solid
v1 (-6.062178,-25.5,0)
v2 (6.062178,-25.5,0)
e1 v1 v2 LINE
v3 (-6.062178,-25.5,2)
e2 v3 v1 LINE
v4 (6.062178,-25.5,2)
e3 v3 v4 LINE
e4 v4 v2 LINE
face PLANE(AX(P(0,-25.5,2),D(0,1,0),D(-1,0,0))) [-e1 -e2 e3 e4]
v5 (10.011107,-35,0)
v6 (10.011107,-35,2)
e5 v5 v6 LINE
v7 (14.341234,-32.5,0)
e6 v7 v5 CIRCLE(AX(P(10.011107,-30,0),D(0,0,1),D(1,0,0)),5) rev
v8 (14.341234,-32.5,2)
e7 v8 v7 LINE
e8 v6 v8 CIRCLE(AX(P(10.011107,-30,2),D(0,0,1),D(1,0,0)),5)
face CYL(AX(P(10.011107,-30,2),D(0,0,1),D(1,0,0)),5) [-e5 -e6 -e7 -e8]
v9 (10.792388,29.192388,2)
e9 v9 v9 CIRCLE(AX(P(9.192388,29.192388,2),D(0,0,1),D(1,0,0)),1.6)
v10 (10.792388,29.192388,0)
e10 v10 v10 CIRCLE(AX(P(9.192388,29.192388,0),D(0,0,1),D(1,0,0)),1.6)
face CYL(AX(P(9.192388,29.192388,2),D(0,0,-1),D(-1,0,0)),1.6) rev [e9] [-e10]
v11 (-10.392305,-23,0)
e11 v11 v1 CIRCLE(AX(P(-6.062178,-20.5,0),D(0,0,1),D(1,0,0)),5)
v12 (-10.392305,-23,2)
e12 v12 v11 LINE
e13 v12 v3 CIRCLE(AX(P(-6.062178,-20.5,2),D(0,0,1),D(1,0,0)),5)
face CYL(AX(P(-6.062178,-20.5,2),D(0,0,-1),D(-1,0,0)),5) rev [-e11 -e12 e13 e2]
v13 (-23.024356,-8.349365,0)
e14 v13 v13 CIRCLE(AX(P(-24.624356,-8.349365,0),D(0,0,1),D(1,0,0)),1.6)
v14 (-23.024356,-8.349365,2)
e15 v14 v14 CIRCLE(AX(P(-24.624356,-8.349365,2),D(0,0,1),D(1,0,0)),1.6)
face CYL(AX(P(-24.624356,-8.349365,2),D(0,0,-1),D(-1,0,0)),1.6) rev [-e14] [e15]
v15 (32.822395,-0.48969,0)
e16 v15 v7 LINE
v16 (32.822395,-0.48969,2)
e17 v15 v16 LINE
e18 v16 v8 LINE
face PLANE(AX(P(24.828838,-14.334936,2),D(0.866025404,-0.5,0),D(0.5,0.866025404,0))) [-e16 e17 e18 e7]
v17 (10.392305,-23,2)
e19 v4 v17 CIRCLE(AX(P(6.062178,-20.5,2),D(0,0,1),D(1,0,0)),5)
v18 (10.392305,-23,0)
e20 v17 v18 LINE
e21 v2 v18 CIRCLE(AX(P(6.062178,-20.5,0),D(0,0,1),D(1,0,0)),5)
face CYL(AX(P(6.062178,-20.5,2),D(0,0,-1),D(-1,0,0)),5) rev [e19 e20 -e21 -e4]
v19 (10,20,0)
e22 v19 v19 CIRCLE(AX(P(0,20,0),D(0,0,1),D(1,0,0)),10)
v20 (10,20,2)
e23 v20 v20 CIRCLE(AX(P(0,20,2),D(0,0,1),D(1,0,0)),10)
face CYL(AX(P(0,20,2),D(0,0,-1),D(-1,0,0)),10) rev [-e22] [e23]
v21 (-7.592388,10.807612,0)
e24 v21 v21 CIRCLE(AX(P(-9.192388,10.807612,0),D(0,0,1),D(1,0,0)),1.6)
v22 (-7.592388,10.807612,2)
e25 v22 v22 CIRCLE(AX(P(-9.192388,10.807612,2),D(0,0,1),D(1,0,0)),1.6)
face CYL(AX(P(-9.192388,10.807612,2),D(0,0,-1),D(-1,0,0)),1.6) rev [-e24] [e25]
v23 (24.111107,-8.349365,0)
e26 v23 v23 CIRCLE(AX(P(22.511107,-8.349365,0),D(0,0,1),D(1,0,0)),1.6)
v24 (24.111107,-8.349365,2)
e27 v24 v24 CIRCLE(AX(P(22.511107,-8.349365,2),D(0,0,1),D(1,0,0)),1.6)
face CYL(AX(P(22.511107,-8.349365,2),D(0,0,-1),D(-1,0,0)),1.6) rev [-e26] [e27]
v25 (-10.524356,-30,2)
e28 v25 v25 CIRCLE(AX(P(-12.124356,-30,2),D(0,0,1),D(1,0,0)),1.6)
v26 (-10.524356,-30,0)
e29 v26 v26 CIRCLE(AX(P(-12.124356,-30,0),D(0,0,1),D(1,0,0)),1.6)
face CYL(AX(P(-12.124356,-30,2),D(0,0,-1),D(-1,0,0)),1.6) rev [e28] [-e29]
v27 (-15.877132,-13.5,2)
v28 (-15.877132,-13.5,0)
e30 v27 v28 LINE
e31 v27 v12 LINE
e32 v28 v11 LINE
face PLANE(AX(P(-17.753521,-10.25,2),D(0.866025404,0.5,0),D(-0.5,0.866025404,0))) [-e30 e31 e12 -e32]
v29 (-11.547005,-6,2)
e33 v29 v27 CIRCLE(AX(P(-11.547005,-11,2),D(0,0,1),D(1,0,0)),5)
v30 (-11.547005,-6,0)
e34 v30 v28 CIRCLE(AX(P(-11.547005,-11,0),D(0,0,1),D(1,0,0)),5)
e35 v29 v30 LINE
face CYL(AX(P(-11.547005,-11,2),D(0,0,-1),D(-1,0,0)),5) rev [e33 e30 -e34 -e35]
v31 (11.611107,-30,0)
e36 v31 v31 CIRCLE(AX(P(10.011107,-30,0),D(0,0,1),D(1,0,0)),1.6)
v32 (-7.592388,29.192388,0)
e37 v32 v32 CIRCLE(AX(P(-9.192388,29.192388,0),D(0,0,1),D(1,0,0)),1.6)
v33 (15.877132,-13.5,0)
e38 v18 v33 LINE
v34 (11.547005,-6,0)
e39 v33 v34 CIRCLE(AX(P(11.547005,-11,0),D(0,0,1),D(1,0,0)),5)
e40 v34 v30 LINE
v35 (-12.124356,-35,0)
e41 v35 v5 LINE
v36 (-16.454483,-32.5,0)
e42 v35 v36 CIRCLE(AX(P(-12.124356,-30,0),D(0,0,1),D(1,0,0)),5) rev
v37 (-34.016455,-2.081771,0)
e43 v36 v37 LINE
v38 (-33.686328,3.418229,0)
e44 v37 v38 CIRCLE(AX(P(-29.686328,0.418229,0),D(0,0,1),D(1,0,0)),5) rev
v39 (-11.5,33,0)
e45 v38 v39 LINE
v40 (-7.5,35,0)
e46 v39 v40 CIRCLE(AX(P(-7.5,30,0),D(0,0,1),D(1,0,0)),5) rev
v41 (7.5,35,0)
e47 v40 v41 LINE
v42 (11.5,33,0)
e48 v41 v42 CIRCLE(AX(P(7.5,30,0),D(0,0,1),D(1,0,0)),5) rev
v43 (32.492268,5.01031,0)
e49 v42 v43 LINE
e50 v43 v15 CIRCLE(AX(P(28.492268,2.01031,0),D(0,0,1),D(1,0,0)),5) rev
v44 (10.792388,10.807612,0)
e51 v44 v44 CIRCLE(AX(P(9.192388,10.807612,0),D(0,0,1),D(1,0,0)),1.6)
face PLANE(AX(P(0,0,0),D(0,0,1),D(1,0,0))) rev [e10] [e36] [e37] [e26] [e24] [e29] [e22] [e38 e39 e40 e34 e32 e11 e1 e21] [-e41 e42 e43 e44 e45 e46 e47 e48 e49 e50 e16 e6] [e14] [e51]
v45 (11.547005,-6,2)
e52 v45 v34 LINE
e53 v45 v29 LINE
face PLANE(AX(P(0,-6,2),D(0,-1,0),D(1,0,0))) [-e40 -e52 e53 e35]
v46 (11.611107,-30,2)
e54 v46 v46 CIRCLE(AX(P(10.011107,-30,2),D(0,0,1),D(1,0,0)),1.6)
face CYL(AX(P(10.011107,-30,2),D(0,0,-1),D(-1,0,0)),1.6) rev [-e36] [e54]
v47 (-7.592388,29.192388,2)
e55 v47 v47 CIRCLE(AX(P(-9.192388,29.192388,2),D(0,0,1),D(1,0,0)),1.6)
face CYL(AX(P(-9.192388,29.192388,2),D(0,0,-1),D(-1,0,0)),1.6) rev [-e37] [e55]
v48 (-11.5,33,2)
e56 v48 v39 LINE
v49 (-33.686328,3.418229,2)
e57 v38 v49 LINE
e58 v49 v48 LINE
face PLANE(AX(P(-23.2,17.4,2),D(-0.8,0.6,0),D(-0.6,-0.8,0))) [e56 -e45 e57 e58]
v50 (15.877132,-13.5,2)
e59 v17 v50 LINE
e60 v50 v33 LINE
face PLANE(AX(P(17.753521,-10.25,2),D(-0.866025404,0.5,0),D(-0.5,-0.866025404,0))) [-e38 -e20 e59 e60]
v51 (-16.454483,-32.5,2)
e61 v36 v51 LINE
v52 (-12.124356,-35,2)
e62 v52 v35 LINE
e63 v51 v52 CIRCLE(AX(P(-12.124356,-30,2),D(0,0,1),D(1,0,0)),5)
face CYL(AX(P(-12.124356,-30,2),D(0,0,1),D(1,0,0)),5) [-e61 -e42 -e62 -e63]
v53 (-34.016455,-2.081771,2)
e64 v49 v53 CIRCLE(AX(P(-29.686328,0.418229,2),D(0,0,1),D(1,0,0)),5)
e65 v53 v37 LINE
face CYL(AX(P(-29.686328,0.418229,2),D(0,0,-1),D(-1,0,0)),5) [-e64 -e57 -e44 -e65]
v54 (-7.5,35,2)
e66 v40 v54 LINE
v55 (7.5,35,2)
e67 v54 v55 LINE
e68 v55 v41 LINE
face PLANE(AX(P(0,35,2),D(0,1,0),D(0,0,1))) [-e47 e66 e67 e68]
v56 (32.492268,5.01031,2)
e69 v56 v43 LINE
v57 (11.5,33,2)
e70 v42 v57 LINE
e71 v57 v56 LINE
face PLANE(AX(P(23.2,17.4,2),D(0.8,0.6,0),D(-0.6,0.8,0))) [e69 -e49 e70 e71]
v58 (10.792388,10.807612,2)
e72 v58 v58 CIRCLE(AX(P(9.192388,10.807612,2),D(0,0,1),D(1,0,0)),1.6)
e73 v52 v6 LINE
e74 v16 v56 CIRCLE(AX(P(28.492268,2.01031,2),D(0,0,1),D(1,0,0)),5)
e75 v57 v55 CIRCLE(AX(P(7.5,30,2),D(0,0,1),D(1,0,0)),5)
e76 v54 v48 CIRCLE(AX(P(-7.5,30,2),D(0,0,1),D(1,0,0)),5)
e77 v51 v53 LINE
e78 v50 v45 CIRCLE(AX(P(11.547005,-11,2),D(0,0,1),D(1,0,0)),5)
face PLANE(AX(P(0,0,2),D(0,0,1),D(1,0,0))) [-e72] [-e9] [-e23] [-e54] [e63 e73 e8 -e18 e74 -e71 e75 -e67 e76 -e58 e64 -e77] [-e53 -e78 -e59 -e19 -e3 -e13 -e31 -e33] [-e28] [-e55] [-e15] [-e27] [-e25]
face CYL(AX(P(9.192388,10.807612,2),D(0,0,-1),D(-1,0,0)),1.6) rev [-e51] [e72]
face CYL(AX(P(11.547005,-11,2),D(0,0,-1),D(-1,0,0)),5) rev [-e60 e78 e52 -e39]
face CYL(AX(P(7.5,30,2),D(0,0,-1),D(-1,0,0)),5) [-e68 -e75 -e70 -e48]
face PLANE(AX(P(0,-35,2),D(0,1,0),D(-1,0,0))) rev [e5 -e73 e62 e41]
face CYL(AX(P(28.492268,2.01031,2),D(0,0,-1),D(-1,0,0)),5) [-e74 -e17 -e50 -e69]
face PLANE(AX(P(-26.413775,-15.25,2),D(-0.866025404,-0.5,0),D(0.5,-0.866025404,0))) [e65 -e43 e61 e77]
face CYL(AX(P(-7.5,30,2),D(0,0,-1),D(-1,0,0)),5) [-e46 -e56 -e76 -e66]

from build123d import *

# Parameters (mm, degrees)
EXTRUDE_1_OUTLINE_R   = 1.6
EXTRUDE_1_OUTLINE_R_2 = 10
EXTRUDE_1_DEPTH       = 2
FILLET_1_R            = 5


# Read off the part's stored shape, not the designer's step: ﾎﾞｽ - 押し出し1
with BuildPart() as part:
    # ﾎﾞｽ - 押し出し1 outline → ﾎﾞｽ - 押し出し1 (new body)
    with BuildSketch(Plane.XY):
        Polygon((-15.011106999, -35), (12.897858345, -35), (34.473029949, 2.369293401), (10, 35), (-10, 35), (-35.667090423, 0.77721277), align=None)
        with Locations((-12.124355653, -30)):
            Circle(EXTRUDE_1_OUTLINE_R, mode=Mode.SUBTRACT)
        with Locations((-24.624355653, -8.349364905)):
            Circle(EXTRUDE_1_OUTLINE_R, mode=Mode.SUBTRACT)
        with Locations((10.011106999, -30)):
            Circle(EXTRUDE_1_OUTLINE_R, mode=Mode.SUBTRACT)
        with BuildLine():
            Line((6.062177826, -25.5), (-6.062177826, -25.5))
            ThreePointArc((-6.062177826, -25.5), (-8.562177826, -24.830127019), (-10.392304845, -23))
            Line((-10.392304845, -23), (-15.877132403, -13.5))
            ThreePointArc((-15.877132403, -13.5), (-15.877132403, -8.5), (-11.547005384, -6))
            Line((-11.547005384, -6), (11.547005384, -6))
            ThreePointArc((11.547005384, -6), (15.877132403, -8.5), (15.877132403, -13.5))
            Line((15.877132403, -13.5), (10.392304845, -23))
            ThreePointArc((10.392304845, -23), (8.562177826, -24.830127019), (6.062177826, -25.5))
        make_face(mode=Mode.SUBTRACT)
        with Locations((22.511106999, -8.349364905)):
            Circle(EXTRUDE_1_OUTLINE_R, mode=Mode.SUBTRACT)
        with Locations((-9.192388155, 10.807611845)):
            Circle(EXTRUDE_1_OUTLINE_R, mode=Mode.SUBTRACT)
        with Locations((-9.192388155, 29.192388155)):
            Circle(EXTRUDE_1_OUTLINE_R, mode=Mode.SUBTRACT)
        with Locations((9.192388155, 10.807611845)):
            Circle(EXTRUDE_1_OUTLINE_R, mode=Mode.SUBTRACT)
        with Locations((0, 20)):
            Circle(EXTRUDE_1_OUTLINE_R_2, mode=Mode.SUBTRACT)
        with Locations((9.192388155, 29.192388155)):
            Circle(EXTRUDE_1_OUTLINE_R, mode=Mode.SUBTRACT)
    extrude(amount=EXTRUDE_1_DEPTH)

    # ﾌｨﾚｯﾄ1
    fillet_1_edges = [part.edges().sort_by_distance(p)[0] for p in [
        (12.897858345, -35, 1),
        (-15.011106999, -35, 1),
        (-35.667090423, 0.77721277, 1),
        (-10, 35, 1),
        (10, 35, 1),
        (34.473029949, 2.369293401, 1),
    ]]
    fillet(fillet_1_edges, radius=FILLET_1_R)


solid = part.part
